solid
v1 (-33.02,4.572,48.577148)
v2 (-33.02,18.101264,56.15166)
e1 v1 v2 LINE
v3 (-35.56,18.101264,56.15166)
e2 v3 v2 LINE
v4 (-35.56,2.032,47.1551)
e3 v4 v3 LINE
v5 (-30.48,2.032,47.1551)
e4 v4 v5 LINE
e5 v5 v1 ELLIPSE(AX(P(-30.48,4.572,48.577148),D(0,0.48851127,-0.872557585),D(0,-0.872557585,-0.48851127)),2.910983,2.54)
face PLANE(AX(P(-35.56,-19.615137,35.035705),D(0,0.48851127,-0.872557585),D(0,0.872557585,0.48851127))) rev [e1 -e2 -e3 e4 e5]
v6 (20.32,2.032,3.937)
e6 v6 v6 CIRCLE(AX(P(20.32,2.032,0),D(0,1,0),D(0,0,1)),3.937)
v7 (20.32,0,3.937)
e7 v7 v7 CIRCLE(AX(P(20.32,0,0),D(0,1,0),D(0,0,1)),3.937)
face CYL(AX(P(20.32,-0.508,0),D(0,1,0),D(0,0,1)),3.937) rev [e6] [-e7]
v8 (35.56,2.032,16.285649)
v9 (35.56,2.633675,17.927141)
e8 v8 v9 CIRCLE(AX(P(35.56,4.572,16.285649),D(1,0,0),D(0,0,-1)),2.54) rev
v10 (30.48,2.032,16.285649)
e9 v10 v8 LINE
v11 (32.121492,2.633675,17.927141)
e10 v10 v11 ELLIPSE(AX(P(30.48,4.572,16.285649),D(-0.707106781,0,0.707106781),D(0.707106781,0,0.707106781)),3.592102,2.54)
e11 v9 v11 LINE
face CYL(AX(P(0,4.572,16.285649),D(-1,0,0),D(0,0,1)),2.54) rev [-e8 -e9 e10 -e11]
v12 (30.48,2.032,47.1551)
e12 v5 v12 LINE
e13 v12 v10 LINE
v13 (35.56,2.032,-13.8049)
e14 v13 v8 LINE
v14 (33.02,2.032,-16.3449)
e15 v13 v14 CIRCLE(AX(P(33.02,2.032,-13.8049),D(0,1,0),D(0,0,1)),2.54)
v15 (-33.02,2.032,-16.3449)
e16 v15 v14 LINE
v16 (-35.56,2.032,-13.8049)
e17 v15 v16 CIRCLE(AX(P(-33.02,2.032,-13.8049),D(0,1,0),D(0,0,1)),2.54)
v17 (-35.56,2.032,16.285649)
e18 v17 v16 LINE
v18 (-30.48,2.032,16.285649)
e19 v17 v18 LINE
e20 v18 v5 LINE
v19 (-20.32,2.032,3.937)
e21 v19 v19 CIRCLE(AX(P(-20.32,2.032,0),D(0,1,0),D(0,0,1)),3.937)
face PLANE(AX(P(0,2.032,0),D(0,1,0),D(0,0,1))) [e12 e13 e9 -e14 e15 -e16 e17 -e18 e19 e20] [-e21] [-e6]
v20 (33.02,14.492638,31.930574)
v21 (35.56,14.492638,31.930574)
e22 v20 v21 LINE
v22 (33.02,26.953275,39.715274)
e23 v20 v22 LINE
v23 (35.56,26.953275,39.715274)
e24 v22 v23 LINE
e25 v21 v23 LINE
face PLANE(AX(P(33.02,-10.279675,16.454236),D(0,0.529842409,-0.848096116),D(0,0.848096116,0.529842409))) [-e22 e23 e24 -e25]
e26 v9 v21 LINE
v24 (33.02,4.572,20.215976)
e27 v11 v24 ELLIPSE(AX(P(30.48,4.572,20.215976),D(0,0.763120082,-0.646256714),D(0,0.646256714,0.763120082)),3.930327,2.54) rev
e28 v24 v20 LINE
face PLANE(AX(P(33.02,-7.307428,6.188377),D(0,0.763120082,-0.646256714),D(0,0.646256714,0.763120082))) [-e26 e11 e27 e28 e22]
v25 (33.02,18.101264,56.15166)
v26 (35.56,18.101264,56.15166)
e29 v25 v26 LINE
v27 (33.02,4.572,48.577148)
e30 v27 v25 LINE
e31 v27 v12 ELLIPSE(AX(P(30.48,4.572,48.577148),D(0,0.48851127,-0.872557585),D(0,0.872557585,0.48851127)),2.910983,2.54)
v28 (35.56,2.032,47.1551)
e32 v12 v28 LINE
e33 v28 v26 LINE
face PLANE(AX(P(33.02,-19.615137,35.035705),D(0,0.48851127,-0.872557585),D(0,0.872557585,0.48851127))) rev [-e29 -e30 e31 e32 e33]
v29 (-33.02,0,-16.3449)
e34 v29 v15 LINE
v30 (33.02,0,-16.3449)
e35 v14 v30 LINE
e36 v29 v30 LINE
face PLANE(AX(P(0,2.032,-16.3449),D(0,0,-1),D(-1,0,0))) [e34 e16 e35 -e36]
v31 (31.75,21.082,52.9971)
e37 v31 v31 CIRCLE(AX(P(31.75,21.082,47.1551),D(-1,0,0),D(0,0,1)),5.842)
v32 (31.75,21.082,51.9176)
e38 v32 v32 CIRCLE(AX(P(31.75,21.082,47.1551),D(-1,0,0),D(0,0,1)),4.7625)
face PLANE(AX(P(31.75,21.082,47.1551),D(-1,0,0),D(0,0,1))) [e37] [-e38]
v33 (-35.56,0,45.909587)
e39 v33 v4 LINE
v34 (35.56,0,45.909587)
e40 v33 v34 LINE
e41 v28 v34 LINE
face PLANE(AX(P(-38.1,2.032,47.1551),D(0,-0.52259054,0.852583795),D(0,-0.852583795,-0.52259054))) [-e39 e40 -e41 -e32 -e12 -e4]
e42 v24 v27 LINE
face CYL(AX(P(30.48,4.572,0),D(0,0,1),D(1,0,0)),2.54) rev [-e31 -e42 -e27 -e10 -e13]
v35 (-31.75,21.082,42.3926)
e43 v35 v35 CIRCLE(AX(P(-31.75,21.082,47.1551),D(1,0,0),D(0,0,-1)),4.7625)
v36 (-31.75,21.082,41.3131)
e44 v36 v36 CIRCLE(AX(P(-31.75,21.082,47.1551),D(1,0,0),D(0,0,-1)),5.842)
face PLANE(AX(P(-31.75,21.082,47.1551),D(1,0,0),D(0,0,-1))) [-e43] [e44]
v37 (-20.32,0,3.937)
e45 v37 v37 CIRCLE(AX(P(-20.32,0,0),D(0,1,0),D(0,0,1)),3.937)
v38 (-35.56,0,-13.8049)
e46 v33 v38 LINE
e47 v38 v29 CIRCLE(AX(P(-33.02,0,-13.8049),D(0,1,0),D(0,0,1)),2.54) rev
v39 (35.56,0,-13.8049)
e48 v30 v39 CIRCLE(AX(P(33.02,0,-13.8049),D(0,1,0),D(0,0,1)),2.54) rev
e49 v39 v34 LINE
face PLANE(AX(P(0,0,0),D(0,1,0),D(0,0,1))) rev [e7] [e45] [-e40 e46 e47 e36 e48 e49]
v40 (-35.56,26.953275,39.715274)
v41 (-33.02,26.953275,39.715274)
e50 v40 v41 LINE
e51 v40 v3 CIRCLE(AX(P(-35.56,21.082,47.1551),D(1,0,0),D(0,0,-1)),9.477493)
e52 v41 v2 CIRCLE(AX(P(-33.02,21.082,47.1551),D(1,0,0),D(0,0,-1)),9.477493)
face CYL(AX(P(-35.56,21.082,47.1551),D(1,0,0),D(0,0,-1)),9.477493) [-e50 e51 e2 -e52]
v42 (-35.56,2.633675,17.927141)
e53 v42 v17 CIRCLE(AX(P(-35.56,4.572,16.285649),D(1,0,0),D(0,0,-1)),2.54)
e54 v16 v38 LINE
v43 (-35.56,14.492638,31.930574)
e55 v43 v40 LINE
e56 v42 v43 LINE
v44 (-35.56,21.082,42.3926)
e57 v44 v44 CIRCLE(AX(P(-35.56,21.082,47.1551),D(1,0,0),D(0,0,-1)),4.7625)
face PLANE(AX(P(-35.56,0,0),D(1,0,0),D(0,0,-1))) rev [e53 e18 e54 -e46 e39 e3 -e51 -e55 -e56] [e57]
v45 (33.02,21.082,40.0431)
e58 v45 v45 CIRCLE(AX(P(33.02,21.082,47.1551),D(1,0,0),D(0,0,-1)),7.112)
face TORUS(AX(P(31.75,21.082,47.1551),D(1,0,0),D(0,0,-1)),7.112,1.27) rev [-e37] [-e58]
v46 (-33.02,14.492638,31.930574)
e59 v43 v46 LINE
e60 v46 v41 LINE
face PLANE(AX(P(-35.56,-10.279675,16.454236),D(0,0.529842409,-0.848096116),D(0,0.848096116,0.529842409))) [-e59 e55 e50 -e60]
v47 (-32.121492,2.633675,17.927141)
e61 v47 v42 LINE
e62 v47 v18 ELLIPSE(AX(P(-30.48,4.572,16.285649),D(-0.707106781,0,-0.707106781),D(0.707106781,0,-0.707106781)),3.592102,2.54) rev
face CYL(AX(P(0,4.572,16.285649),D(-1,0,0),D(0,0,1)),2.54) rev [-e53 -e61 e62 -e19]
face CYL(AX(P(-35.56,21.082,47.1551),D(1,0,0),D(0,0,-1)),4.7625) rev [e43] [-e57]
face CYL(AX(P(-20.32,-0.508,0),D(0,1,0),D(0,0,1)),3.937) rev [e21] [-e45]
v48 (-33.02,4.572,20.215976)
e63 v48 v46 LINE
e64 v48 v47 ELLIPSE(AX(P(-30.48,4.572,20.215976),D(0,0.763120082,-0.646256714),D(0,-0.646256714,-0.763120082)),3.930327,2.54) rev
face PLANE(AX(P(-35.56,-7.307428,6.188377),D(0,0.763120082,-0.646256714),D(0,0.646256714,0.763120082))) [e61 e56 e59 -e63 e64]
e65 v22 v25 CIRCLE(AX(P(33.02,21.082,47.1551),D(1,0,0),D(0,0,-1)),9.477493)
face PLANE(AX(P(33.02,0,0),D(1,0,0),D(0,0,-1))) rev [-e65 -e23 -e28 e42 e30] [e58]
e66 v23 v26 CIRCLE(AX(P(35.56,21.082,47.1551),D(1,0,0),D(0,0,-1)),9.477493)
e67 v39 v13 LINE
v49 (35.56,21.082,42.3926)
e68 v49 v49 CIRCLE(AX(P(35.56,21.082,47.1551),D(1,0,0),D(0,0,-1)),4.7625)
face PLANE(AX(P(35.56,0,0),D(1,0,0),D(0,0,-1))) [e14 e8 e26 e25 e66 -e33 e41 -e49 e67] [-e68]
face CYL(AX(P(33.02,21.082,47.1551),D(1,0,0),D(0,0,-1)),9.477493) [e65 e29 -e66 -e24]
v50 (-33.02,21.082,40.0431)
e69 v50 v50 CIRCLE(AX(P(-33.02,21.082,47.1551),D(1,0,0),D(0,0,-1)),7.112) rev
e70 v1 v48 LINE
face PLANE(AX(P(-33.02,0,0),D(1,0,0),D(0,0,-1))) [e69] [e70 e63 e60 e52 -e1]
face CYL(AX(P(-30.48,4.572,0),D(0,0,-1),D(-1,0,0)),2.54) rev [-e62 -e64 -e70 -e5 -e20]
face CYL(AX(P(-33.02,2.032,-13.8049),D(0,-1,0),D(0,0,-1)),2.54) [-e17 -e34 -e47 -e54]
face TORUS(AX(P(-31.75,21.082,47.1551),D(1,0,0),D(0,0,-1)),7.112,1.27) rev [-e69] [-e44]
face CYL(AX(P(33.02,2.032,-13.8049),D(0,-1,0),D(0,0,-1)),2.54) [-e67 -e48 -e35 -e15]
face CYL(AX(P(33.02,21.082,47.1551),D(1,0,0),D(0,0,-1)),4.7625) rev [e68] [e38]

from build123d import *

# Parameters (mm, degrees)
SKETCH1_R           = 2.7051
BOSS_EXTRUDE1_DEPTH = 2.032
CUT_EXTRUDE1_DEPTH  = 90.633545506
BOSS_EXTRUDE2_START = -2.54
SKETCH2_3_R         = 4.7625
BOSS_EXTRUDE2_DEPTH = 2.54
BOSS_EXTRUDE3_START = -71.12
SKETCH2_4_R         = 4.7625
BOSS_EXTRUDE3_DEPTH = 2.54
SKETCH3_W           = 2.54
SKETCH3_H           = 63.5
CUT_EXTRUDE2_DEPTH  = 74.9775539
FILLET1_R           = 2.54
FILLET2_R           = 2.54
FILLET3_R           = 2.54
BOSS_EXTRUDE4_START = 1.27
SKETCH4_R           = 5.842
SKETCH4_R_2         = 4.7625
BOSS_EXTRUDE4_DEPTH = 1.27
FILLET4_R           = 1.27
SKETCH5_R           = 5.842
SKETCH5_R_2         = 4.7625
BOSS_EXTRUDE5_DEPTH = 1.27
FILLET5_R           = 1.27
SKETCH6_R           = 3.937
CUT_EXTRUDE3_DEPTH  = 2.54


with BuildPart() as part:
    # Sketch1 → Boss-Extrude1 (new body)
    with BuildSketch(Plane(origin=(0, 0, 0), x_dir=(1, 0, 0), z_dir=(0, 1, 0))):
        Polygon((-38.1, -47.1551), (-20.32, -47.1551), (20.32, -47.1551), (38.1, -47.1551), (38.1, 16.3449), (-38.1, 16.3449), align=None)
        with Locations(Location((-20.32, 0, 0), (0, 0, 270))):
            Circle(SKETCH1_R, mode=Mode.SUBTRACT)
        with Locations(Location((20.32, 0, 0), (0, 0, 270))):
            Circle(SKETCH1_R, mode=Mode.SUBTRACT)
    extrude(amount=BOSS_EXTRUDE1_DEPTH)

    # Sketch2 → Cut-Extrude1 (cut, through all)
    with BuildSketch(Plane(origin=(38.1, 0, 0), x_dir=(0, 0, -1), z_dir=(1, 0, 0))):
        Polygon((-47.1551, 2.032), (-47.1551, 0), (-45.909587262, 0), align=None)
    extrude(amount=-CUT_EXTRUDE1_DEPTH, mode=Mode.SUBTRACT)

    # Sketch2<3> → Boss-Extrude2 (add)
    with BuildSketch(Plane(origin=(38.1, 0, 0), x_dir=(0, 0, -1), z_dir=(1, 0, 0)).offset(BOSS_EXTRUDE2_START)):
        with BuildLine():
            Line((-17.216664477, 2.032), (-31.930573826, 14.492637507))
            Line((-31.930573826, 14.492637507), (-38.61588269, 25.193525887))
            Line((-38.61588269, 25.193525887), (-39.715274256, 26.953275014))
            ThreePointArc((-39.715274256, 26.953275014), (-51.649026967, 29.426309307), (-56.151659952, 18.101264116))
            Line((-56.151659952, 18.101264116), (-54.398825604, 14.970427636))
            Line((-54.398825604, 14.970427636), (-47.1551, 2.032))
            Line((-47.1551, 2.032), (-24.145873396, 2.032))
            Line((-24.145873396, 2.032), (-17.216664477, 2.032))
        make_face()
        with Locations((-47.1551, 21.082)):
            Circle(SKETCH2_3_R, mode=Mode.SUBTRACT)
    extrude(amount=-BOSS_EXTRUDE2_DEPTH)

    # Sketch2<4> → Boss-Extrude3 (add)
    with BuildSketch(Plane(origin=(38.1, 0, 0), x_dir=(0, 0, -1), z_dir=(1, 0, 0)).offset(BOSS_EXTRUDE3_START)):
        with BuildLine():
            Line((-17.216664477, 2.032), (-31.930573826, 14.492637507))
            Line((-31.930573826, 14.492637507), (-38.61588269, 25.193525887))
            Line((-38.61588269, 25.193525887), (-39.715274256, 26.953275014))
            ThreePointArc((-39.715274256, 26.953275014), (-51.649026967, 29.426309307), (-56.151659952, 18.101264116))
            Line((-56.151659952, 18.101264116), (-54.398825604, 14.970427636))
            Line((-54.398825604, 14.970427636), (-47.1551, 2.032))
            Line((-47.1551, 2.032), (-24.145873396, 2.032))
            Line((-24.145873396, 2.032), (-17.216664477, 2.032))
        make_face()
        with Locations((-47.1551, 21.082)):
            Circle(SKETCH2_4_R, mode=Mode.SUBTRACT)
    extrude(amount=-BOSS_EXTRUDE3_DEPTH)

    # Sketch3 → Cut-Extrude2 (cut, through all)
    with BuildSketch(Plane(origin=(0, 2.032, 0), x_dir=(1, 0, 0), z_dir=(0, 1, 0))):
        with Locations((-36.83, -15.4051)):
            Rectangle(SKETCH3_W, SKETCH3_H)
        Polygon((35.56, -47.1551), (38.1, -47.1551), (38.1, 16.3449), (36.83, 16.3449), (35.56, 16.3449), align=None)
    extrude(amount=-CUT_EXTRUDE2_DEPTH, mode=Mode.SUBTRACT)

    # Fillet1
    fillet1_edges = [part.edges().sort_by_distance(p)[0] for p in [
        (34.29, 2.032, 17.216664477),
        (33.02, 2.032, 32.185882239),
        (-33.02, 2.032, 32.185882239),
        (-34.29, 2.032, 17.216664477),
    ]]
    fillet(fillet1_edges, radius=FILLET1_R)

    # Fillet2
    fillet2_edges = [part.edges().sort_by_distance(p)[0] for p in [
        (-35.56, 1.016, -16.3449),
    ]]
    fillet(fillet2_edges, radius=FILLET2_R)

    # Fillet3
    fillet3_edges = [part.edges().sort_by_distance(p)[0] for p in [
        (35.56, 1.016, -16.3449),
    ]]
    fillet(fillet3_edges, radius=FILLET3_R)

    # Sketch4 → Boss-Extrude4 (add)
    with BuildSketch(Plane(origin=(-33.02, 0, 0), x_dir=(0, 0, -1), z_dir=(1, 0, 0)).offset(BOSS_EXTRUDE4_START)):
        with Locations((-47.1551, 21.082)):
            Circle(SKETCH4_R)
        with Locations((-47.1551, 21.082)):
            Circle(SKETCH4_R_2, mode=Mode.SUBTRACT)
    extrude(amount=-BOSS_EXTRUDE4_DEPTH)

    # Fillet4
    fillet4_edges = [part.edges().sort_by_distance(p)[0] for p in [
        (-33.02, 21.082, 52.9971),
    ]]
    fillet(fillet4_edges, radius=FILLET4_R - 0.0001)  # a hair under: the kernel refuses the full size

    # Sketch5 → Boss-Extrude5 (add)
    with BuildSketch(Plane.ZY.offset(-33.02)):
        with Locations(Location((47.1551, 21.082, 0), (0, 0, 180))):
            Circle(SKETCH5_R)
        with Locations(Location((47.1551, 21.082, 0), (0, 0, 180))):
            Circle(SKETCH5_R_2, mode=Mode.SUBTRACT)
    extrude(amount=BOSS_EXTRUDE5_DEPTH)

    # Fillet5
    fillet5_edges = [part.edges().sort_by_distance(p)[0] for p in [
        (33.02, 21.082, 52.9971),
    ]]
    fillet(fillet5_edges, radius=FILLET5_R - 0.0001)  # a hair under: the kernel refuses the full size

    # Sketch6 → Cut-Extrude3 (cut)
    with BuildSketch(Plane(origin=(0, 2.032, 0), x_dir=(1, 0, 0), z_dir=(0, 1, 0))):
        with Locations(Location((-20.32, 0, 0), (0, 0, 270))):
            Circle(SKETCH6_R)
        with Locations(Location((20.32, 0, 0), (0, 0, 270))):
            Circle(SKETCH6_R)
    extrude(amount=-CUT_EXTRUDE3_DEPTH, mode=Mode.SUBTRACT)


solid = part.part
